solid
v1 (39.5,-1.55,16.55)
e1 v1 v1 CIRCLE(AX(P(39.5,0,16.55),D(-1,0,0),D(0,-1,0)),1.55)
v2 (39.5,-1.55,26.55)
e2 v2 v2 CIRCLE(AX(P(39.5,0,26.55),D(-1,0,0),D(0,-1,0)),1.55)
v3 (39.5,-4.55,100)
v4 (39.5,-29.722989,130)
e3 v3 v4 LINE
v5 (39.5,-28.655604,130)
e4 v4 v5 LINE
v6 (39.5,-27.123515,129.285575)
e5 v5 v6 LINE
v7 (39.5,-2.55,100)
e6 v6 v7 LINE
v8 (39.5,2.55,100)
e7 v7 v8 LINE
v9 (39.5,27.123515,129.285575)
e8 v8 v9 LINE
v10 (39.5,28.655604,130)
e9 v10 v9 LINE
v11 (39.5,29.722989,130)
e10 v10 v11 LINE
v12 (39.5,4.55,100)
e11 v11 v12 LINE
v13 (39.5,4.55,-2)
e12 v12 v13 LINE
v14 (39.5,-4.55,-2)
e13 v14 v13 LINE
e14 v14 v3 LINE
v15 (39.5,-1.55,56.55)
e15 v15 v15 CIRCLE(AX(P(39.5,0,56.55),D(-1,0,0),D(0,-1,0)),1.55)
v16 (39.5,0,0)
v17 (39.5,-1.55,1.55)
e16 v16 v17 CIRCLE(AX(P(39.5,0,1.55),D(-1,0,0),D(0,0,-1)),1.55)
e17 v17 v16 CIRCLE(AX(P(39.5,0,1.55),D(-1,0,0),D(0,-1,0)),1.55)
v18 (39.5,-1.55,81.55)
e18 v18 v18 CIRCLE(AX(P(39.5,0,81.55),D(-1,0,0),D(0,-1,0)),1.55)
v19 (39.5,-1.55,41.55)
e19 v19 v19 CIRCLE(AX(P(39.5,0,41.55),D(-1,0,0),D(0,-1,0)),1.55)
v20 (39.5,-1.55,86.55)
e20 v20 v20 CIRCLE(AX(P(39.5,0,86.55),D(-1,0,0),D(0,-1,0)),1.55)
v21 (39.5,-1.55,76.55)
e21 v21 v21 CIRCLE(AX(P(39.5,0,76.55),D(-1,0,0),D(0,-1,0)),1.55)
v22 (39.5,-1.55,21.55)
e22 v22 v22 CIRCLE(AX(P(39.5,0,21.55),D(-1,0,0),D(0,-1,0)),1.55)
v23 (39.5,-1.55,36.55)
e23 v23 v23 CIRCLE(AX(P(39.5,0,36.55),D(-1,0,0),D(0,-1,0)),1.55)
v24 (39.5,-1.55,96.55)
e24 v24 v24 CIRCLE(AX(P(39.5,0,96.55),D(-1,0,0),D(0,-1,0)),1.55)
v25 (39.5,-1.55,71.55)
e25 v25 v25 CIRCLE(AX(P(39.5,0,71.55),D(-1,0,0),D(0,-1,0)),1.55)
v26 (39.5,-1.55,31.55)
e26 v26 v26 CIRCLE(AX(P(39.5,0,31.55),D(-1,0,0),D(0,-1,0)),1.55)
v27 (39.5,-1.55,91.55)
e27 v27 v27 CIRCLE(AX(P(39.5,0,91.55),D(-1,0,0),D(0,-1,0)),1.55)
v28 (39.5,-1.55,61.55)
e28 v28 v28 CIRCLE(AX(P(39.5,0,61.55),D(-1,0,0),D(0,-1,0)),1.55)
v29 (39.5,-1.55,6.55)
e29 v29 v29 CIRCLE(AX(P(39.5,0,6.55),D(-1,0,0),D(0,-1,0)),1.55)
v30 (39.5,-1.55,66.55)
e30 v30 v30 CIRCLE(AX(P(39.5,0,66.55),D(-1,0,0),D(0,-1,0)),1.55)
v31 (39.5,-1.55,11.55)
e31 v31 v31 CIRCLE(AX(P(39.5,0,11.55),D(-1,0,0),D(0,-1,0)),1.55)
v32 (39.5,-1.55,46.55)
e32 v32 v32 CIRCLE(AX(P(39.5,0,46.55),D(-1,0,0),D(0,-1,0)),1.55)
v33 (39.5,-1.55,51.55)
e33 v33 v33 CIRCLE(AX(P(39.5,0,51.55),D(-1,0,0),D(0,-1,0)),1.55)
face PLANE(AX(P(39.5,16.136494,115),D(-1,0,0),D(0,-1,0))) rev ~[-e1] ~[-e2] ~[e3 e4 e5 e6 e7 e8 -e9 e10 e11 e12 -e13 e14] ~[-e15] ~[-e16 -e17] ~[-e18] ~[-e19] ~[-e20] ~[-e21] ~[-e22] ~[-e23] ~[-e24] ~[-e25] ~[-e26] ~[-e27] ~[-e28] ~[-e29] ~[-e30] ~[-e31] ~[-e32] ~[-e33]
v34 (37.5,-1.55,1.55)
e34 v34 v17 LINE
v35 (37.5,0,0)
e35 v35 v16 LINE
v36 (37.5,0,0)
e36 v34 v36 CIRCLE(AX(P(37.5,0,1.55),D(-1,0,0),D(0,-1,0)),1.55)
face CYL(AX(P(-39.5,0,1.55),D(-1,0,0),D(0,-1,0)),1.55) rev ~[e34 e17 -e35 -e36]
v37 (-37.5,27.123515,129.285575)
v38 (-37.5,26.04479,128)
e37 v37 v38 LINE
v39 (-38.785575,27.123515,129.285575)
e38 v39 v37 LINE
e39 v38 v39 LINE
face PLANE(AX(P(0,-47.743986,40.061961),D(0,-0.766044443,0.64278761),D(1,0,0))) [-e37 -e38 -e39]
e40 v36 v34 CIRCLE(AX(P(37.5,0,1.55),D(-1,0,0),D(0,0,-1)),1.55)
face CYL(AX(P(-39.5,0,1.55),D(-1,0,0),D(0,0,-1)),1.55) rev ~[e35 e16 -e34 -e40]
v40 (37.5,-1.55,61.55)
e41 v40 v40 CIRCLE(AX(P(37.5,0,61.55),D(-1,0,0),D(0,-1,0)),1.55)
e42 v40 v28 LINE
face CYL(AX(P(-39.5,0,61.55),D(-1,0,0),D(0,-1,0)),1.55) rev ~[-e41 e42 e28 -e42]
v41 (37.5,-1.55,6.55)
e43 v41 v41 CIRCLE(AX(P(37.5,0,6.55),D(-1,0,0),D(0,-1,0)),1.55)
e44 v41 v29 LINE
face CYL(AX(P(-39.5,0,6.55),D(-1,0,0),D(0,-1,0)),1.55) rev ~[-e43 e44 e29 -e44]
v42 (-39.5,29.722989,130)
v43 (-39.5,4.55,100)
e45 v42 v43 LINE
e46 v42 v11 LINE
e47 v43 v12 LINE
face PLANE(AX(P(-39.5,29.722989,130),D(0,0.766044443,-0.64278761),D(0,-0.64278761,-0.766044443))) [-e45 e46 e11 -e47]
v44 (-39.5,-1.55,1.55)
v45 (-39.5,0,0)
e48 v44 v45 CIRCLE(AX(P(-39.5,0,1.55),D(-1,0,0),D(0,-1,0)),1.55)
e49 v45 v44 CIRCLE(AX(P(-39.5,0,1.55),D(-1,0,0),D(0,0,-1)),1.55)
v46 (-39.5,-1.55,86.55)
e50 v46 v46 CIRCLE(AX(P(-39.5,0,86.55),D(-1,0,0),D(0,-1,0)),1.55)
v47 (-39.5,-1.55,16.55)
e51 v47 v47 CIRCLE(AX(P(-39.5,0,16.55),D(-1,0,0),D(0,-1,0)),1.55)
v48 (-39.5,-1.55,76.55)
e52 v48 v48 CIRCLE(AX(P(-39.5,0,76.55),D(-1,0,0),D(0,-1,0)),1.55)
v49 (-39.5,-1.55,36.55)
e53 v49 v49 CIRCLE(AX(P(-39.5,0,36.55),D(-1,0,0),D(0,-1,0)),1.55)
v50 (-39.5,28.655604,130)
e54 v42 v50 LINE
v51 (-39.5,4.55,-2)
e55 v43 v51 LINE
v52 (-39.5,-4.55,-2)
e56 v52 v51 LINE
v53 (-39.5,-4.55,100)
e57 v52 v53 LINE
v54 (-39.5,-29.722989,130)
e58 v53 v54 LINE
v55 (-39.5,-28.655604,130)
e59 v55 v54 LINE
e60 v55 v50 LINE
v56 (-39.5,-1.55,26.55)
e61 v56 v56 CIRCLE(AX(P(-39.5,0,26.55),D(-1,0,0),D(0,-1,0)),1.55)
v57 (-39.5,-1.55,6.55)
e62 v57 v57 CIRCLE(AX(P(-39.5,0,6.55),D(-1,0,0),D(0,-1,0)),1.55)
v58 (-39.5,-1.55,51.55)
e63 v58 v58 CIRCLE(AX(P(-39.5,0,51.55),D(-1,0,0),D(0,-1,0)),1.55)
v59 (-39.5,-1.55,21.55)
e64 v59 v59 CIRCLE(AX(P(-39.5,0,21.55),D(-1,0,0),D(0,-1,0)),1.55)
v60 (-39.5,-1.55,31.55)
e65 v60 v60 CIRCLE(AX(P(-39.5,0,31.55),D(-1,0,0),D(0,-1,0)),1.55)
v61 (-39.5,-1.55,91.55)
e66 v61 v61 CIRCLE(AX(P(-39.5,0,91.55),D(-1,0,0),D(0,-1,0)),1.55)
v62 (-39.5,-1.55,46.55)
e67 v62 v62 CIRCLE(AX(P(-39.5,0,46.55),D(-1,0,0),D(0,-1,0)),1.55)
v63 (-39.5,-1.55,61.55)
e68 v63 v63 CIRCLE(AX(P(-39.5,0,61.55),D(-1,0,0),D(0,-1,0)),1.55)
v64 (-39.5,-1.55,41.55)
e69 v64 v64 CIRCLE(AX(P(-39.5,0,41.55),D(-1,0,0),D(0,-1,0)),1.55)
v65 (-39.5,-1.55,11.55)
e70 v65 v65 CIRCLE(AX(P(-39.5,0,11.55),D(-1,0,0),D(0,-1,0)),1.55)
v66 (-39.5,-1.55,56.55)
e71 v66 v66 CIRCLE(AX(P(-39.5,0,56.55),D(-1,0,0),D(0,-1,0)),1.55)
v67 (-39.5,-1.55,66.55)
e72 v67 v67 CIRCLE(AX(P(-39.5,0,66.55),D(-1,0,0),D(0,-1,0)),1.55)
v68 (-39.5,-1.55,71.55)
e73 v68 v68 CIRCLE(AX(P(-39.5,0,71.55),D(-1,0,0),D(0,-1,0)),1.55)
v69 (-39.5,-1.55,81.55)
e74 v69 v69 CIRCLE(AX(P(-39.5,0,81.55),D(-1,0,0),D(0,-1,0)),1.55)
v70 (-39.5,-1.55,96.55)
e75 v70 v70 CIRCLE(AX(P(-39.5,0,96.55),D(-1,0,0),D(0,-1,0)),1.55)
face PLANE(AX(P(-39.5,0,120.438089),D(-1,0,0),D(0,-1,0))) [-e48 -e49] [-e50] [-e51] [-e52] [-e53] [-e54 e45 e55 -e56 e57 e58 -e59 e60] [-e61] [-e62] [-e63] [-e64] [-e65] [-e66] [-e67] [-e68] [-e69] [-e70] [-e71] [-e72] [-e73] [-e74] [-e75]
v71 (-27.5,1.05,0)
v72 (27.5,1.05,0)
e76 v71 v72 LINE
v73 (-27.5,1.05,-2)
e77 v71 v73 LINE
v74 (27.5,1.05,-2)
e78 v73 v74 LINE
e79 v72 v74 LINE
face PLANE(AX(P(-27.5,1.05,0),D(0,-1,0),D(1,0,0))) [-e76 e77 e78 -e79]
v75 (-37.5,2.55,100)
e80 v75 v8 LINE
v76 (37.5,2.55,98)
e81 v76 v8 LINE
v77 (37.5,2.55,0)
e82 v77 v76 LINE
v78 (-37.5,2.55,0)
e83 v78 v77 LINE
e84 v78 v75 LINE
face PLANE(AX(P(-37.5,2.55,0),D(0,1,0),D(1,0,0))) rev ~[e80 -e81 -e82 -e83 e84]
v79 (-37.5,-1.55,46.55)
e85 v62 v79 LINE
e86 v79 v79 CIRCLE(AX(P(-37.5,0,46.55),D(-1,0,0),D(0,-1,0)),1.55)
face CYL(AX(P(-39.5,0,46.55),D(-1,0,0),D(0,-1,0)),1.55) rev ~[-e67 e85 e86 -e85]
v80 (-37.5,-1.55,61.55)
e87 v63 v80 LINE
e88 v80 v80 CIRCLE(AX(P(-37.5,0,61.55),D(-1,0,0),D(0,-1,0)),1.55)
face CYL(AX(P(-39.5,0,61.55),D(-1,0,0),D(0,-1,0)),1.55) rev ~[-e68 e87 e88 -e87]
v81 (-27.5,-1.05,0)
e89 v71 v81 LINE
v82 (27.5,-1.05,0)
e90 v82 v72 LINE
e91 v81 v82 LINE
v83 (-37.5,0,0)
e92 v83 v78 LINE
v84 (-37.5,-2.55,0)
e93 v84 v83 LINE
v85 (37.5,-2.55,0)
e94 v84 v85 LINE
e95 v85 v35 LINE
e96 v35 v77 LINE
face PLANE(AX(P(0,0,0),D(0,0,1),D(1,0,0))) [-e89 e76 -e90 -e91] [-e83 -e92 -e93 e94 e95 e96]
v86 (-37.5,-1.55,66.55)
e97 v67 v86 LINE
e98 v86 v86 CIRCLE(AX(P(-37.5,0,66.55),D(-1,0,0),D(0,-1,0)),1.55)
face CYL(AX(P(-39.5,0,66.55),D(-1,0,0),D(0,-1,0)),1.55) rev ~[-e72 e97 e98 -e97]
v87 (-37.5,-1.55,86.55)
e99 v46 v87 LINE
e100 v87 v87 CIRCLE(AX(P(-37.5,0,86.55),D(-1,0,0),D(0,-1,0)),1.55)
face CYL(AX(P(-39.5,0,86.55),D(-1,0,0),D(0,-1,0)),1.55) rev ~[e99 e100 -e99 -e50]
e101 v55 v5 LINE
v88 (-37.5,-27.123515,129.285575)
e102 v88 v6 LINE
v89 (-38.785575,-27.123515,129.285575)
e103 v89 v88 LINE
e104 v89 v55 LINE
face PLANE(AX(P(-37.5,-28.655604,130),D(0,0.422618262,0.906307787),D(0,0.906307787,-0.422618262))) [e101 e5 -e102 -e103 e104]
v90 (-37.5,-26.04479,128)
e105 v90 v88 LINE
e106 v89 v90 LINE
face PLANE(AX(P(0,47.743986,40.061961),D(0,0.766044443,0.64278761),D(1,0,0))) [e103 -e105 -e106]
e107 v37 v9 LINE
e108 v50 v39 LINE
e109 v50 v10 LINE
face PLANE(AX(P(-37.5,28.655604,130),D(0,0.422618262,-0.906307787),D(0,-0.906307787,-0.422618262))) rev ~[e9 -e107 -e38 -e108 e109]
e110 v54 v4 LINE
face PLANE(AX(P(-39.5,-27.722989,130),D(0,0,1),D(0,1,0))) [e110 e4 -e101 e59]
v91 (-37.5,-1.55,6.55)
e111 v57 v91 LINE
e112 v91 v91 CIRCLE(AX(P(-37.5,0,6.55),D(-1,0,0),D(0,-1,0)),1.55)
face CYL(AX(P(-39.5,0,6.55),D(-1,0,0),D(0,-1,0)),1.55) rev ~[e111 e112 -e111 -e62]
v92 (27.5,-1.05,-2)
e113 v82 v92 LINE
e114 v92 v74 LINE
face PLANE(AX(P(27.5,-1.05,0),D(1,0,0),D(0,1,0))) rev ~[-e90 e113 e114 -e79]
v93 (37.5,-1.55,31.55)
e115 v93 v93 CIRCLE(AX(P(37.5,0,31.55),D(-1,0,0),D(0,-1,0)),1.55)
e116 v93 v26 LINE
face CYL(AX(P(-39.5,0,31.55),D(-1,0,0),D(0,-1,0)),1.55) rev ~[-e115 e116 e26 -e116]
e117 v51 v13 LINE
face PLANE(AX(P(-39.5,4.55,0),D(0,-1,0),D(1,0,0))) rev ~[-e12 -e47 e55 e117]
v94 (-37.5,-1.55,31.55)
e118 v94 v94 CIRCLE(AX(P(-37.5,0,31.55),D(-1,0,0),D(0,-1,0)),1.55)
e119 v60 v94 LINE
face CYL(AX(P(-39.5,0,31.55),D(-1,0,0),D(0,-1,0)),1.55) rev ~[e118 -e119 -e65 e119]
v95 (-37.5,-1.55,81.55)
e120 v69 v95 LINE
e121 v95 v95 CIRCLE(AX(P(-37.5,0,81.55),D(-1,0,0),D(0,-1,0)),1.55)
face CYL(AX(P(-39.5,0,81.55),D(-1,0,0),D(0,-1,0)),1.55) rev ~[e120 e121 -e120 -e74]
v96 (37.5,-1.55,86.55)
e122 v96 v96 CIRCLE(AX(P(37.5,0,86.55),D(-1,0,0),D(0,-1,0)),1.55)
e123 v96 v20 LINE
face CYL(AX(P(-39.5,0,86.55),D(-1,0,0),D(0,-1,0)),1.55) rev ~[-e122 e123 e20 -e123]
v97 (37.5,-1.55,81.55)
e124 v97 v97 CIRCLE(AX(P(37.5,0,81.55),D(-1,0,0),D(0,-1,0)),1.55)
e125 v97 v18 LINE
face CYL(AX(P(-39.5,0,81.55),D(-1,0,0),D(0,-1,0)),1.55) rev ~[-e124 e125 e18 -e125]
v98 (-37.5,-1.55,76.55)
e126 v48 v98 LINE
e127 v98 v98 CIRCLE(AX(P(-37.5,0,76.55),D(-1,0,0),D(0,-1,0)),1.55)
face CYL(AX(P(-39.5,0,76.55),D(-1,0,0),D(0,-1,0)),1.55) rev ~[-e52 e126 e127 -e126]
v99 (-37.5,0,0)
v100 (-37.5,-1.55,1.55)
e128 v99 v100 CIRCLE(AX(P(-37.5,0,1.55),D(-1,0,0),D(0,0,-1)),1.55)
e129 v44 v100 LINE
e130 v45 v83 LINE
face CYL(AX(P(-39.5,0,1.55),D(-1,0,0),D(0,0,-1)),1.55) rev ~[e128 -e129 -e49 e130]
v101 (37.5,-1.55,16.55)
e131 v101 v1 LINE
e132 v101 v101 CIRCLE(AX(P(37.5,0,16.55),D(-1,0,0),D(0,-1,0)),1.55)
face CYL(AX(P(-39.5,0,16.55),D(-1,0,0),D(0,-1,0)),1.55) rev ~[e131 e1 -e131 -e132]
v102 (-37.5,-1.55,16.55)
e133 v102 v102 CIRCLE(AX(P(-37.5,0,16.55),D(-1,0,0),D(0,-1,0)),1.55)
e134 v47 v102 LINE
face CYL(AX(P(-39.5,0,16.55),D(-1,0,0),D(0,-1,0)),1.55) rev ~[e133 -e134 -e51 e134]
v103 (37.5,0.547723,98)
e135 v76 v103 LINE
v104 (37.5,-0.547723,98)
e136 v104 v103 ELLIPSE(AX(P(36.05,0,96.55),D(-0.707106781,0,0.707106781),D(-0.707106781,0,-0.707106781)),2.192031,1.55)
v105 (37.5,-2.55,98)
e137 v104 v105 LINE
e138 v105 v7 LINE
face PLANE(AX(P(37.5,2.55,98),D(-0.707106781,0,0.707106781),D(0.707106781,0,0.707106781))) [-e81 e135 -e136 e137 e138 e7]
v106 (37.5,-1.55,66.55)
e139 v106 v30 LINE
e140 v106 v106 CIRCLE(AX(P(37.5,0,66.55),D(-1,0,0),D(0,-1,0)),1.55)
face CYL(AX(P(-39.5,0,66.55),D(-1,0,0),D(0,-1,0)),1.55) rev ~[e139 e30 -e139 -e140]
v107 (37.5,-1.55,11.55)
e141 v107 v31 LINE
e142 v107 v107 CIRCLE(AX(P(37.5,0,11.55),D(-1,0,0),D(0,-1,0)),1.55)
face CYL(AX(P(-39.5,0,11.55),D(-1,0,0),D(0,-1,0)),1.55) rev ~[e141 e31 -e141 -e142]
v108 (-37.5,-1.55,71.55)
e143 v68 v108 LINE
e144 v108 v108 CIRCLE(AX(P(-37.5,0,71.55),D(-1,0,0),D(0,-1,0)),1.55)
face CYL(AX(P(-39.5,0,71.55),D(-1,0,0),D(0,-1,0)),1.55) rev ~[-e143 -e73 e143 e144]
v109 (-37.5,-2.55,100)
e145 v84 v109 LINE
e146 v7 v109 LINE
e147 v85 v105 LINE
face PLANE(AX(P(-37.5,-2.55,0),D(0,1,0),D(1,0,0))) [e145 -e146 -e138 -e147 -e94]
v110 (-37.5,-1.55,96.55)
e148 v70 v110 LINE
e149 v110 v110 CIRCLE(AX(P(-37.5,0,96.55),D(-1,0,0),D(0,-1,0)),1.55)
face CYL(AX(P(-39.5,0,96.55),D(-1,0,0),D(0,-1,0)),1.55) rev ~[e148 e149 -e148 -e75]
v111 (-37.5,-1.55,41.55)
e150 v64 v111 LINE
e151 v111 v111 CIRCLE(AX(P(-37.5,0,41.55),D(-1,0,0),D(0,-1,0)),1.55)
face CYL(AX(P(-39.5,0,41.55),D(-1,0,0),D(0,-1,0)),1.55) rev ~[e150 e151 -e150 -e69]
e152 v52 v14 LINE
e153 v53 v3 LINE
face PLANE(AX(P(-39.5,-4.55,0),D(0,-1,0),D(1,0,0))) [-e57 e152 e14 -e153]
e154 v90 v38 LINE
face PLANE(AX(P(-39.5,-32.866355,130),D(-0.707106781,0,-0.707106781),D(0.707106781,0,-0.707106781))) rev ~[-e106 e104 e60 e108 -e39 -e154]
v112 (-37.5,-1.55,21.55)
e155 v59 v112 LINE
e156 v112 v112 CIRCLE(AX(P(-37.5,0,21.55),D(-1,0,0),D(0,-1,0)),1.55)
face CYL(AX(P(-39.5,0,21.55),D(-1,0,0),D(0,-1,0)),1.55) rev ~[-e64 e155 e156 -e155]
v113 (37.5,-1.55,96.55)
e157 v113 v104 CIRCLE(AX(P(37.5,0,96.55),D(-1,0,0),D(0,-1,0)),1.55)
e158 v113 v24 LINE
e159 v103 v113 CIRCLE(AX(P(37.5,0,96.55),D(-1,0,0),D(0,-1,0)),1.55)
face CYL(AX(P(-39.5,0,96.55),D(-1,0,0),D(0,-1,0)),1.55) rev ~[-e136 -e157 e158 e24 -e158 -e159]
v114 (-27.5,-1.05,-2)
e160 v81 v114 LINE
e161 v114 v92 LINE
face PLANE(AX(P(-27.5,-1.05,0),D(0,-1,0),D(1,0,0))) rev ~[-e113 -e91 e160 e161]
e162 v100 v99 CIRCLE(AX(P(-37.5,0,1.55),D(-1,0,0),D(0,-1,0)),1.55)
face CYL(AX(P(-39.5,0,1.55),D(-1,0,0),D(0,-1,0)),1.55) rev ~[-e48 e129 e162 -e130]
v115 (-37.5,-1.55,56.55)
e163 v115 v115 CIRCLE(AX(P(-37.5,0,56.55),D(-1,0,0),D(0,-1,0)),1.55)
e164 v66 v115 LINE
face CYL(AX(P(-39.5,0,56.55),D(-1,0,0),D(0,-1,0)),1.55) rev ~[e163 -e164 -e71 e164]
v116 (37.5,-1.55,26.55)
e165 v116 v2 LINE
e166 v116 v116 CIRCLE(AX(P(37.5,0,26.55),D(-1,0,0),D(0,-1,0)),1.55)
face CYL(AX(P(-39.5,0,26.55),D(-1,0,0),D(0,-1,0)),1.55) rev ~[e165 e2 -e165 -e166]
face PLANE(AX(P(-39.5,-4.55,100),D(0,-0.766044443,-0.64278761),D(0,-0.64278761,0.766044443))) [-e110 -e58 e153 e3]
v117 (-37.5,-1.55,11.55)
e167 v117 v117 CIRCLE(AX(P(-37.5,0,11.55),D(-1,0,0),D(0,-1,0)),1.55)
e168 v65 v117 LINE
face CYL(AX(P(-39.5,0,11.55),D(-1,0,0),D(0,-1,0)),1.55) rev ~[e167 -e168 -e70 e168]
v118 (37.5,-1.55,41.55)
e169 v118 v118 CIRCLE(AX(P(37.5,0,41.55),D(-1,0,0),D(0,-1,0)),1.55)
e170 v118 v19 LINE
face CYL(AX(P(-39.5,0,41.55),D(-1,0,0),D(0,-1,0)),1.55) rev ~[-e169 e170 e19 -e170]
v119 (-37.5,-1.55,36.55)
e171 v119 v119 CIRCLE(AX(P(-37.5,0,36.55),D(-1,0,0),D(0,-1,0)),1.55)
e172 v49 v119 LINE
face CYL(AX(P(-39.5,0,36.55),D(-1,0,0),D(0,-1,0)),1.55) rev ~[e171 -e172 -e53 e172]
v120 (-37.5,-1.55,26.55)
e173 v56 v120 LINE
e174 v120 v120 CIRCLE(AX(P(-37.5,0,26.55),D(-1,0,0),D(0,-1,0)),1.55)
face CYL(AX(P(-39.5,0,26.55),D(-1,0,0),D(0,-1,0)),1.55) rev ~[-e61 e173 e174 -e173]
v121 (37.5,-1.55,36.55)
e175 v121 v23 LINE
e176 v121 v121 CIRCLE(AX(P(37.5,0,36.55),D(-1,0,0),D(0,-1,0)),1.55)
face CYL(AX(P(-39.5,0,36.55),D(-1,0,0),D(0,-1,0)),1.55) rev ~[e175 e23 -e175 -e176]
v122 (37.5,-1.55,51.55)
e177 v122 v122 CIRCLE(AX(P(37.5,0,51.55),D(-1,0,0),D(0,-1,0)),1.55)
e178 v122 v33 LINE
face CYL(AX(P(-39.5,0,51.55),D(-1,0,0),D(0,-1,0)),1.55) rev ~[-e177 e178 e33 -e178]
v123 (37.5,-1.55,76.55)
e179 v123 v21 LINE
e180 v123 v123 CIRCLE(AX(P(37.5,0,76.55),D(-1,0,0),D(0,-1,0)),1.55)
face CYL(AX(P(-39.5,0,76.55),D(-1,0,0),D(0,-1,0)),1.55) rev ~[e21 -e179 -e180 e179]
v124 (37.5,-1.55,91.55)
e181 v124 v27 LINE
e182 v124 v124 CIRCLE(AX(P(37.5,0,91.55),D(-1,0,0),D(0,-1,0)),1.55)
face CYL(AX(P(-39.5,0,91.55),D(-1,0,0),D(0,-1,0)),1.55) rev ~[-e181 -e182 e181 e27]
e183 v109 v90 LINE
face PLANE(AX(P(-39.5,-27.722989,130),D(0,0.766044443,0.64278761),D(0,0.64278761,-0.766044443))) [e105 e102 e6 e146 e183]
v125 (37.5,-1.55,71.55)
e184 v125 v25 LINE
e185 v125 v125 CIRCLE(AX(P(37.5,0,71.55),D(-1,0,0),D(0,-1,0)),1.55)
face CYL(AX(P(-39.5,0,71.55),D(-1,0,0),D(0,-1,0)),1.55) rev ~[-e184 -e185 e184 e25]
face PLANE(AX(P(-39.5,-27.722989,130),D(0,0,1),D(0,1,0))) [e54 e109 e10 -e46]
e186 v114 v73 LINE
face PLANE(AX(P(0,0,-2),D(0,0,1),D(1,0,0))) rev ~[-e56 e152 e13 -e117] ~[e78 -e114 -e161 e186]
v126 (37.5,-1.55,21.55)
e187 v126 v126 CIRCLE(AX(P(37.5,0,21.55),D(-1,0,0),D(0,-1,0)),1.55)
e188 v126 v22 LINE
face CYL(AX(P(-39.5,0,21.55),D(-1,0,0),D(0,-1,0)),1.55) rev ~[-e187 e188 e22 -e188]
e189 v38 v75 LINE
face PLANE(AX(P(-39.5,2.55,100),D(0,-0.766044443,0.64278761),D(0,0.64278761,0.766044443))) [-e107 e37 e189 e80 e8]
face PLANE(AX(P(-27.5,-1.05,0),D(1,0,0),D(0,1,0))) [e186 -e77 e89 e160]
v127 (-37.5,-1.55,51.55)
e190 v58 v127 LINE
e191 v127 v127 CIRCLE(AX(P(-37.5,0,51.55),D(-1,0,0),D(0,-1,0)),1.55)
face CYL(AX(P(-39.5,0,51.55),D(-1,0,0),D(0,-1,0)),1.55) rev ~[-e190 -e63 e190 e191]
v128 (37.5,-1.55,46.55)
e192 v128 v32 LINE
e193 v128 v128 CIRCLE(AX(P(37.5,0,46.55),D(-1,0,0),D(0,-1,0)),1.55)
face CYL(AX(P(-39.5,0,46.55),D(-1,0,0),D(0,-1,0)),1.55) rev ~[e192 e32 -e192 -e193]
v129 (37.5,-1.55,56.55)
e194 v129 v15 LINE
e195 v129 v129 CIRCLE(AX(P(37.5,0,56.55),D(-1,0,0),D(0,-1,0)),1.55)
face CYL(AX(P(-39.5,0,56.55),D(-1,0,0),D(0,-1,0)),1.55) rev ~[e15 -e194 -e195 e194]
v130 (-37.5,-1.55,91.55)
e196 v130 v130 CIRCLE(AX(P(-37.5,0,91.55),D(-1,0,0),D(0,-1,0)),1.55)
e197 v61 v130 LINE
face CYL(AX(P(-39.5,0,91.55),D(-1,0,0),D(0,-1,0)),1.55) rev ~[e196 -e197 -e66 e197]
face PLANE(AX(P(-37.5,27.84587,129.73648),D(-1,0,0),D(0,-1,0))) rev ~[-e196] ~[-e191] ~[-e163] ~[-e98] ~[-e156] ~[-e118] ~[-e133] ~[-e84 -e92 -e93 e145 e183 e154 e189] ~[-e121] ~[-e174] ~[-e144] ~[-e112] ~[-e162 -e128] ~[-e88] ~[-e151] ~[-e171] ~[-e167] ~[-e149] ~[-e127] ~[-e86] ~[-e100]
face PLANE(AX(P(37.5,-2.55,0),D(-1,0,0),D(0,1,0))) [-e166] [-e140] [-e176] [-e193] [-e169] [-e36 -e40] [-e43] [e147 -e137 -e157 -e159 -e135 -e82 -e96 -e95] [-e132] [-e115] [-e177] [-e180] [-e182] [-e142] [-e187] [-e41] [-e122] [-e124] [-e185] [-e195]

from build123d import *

# Parameters (mm, degrees)
F0_W         = 79
F0_H         = 9.1
F0_W_2       = 75
F0_H_2       = 5.1
F1_DEPTH     = 100
F0_W_3       = 55
F0_H_3       = 2.1
F2_DEPTH     = 2
F3_R         = 1.55
F4_DEPTH     = 79.001
F6_DEPTH     = 79
F7_DEPTH     = 2
F8_T1_DEPTH  = 5.1
F8_T3_DEPTH  = 79.5142210175
F8_T8_DEPTH  = 65.7327098225
F8_T15_DEPTH = 79.5142210175
F8_T20_DEPTH = 65.7327098225
F8_T28_DEPTH = 65.7327098225
F8_T33_DEPTH = 79.5142210175


# Not quite as in the source:
# - a fillet or chamfer that OpenCascade refuses, or shapes differently, is made with other operations: its cross-section is extruded or revolved along the edge and cut away or added


with BuildPart() as f1:
    # F0 (on Top) → F1 (new body)
    with BuildSketch(Plane.XY):
        Rectangle(F0_W, F0_H)
        Rectangle(F0_W_2, F0_H_2, mode=Mode.SUBTRACT)
    extrude(amount=F1_DEPTH)

    # F0 (on Top) → F2 (join)
    with BuildSketch(Plane.XY):
        Rectangle(F0_W, F0_H)
        Rectangle(F0_W_2, F0_H_2, mode=Mode.SUBTRACT)
        Rectangle(F0_W_2, F0_H_2)
        Rectangle(F0_W_3, F0_H_3, mode=Mode.SUBTRACT)
    extrude(amount=-F2_DEPTH)

    # F3 (on face) → F4 (cut, through all)
    with BuildSketch(Plane(origin=(-39.5, 0, 0), x_dir=(0, -1, 0), z_dir=(-1, 0, 0))):
        with BuildLine():
            ThreePointArc((0, 0), (1.0960155108, 0.4539844892), (1.55, 1.55))
            ThreePointArc((1.55, 1.55), (-1.0960155108, 2.6460155108), (0, 0))
        make_face()
        with Locations((0, 6.55)):
            Circle(F3_R)
        with Locations((0, 11.55)):
            Circle(F3_R)
        with Locations((0, 16.55)):
            Circle(F3_R)
        with Locations((0, 21.55)):
            Circle(F3_R)
        with Locations((0, 26.55)):
            Circle(F3_R)
        with Locations((0, 31.55)):
            Circle(F3_R)
        with Locations((0, 36.55)):
            Circle(F3_R)
        with Locations((0, 41.55)):
            Circle(F3_R)
        with Locations((0, 46.55)):
            Circle(F3_R)
        with Locations((0, 51.55)):
            Circle(F3_R)
        with Locations((0, 56.55)):
            Circle(F3_R)
        with Locations((0, 61.55)):
            Circle(F3_R)
        with Locations((0, 66.55)):
            Circle(F3_R)
        with Locations((0, 71.55)):
            Circle(F3_R)
        with Locations((0, 76.55)):
            Circle(F3_R)
        with Locations((0, 81.55)):
            Circle(F3_R)
        with Locations((0, 86.55)):
            Circle(F3_R)
        with Locations((0, 91.55)):
            Circle(F3_R)
        with Locations((0, 96.55)):
            Circle(F3_R)
    extrude(amount=-F4_DEPTH, mode=Mode.SUBTRACT)

    # F5 (on face) → F6 (join, through all)
    with BuildSketch(Plane(origin=(-39.5, 0, 0), x_dir=(0, -1, 0), z_dir=(-1, 0, 0))):
        Polygon((-29.7229889353, 130), (-4.55, 100), (-2.55, 100), (-27.7229889353, 130), align=None)
        Polygon((27.7229889353, 130), (2.55, 100), (4.55, 100), (29.7229889353, 130), align=None)
    extrude(amount=-F6_DEPTH)

    # F5 (on face) → F7 (join, through all)
    with BuildSketch(Plane(origin=(-39.5, 0, 0), x_dir=(0, -1, 0), z_dir=(-1, 0, 0))):
        Polygon((-27.7229889353, 130), (-2.55, 100), (2.55, 100), (27.7229889353, 130), align=None)
    extrude(amount=-F7_DEPTH)

    # F8: chamfer of 2 on 4 edges, made by hand

    # F8_s2 → F8_t1 (cut)
    with BuildSketch(Plane.XZ.offset(-2.55)):
        Polygon((37.5, 98), (39.5, 100), (37.5, 100), align=None)
    extrude(amount=F8_T1_DEPTH, mode=Mode.SUBTRACT)

    # F8_s4 → F8_t3 (cut)
    with BuildSketch(Plane.YZ.offset(-37.5)):
        Polygon((-28.6556042516, 130), (-27.1235153654, 129.2855752194), (-27.7229889353, 130), align=None)
        Polygon((28.6556042516, 130), (27.1235153654, 129.2855752194), (27.7229889353, 130), align=None)
    extrude(amount=F8_T3_DEPTH, mode=Mode.SUBTRACT)


with BuildPart() as f8_tool6:
    # F8_s7 → F8_t8 (new body)
    with BuildSketch(Plane.XZ.offset(32.8663549113)):
        Polygon((-39.5, 130), (-37.5, 128), (-37.5, 130), align=None)
    extrude(amount=-F8_T8_DEPTH)

    split(bisect_by=Plane(origin=(0, -47.7439862241, 40.0619612316), x_dir=(1, 0, 0), z_dir=(0, -0.7660444431, 0.6427876097)), keep=Keep.TOP)

    split(bisect_by=Plane(origin=(0, 47.7439862241, 40.0619612316), x_dir=(1, 0, 0), z_dir=(0, 0.7660444431, 0.6427876097)), keep=Keep.TOP)


with BuildPart() as f1_1:
    add(f1.part)

    # F8_t5: cut F8_tool6
    add(f8_tool6.part, mode=Mode.SUBTRACT)


with BuildPart() as f8_tool13:
    # F8_s14 → F8_t15 (new body)
    with BuildSketch(Plane.YZ.offset(-40.0142210175)):
        Polygon((-28.6556042516, 130), (-27.1235153654, 129.2855752194), (-27.7229889353, 130), align=None)
    extrude(amount=F8_T15_DEPTH)

    split(bisect_by=Plane.YZ.offset(-37.5), keep=Keep.BOTTOM)

    split(bisect_by=Plane.YZ.offset(-39.5), keep=Keep.TOP)


with BuildPart() as f8_tool18:
    # F8_s19 → F8_t20 (new body)
    with BuildSketch(Plane.XZ.offset(32.8663549113)):
        Polygon((-39.5, 130), (-37.5, 128), (-37.5, 130), align=None)
    extrude(amount=-F8_T20_DEPTH)

    split(bisect_by=Plane(origin=(0, 46.5703380464, 39.0771534786), x_dir=(1, 0, 0), z_dir=(0, 0.7660444431, 0.6427876097)), keep=Keep.TOP)

    split(bisect_by=Plane(origin=(0, 47.7439862241, 40.0619612316), x_dir=(1, 0, 0), z_dir=(0, -0.7660444431, -0.6427876097)), keep=Keep.TOP)


with BuildPart() as f8_tool13_1:
    add(f8_tool13.part)

    # F8_t23: intersect F8_tool18
    add(f8_tool18.part, mode=Mode.INTERSECT)


with BuildPart() as f1_2:
    add(f1_1.part)

    # F8_t11: cut F8_tool13
    add(f8_tool13_1.part, mode=Mode.SUBTRACT)


with BuildPart() as f8_tool26:
    # F8_s27 → F8_t28 (new body)
    with BuildSketch(Plane.XZ.offset(32.8663549113)):
        Polygon((-39.5, 130), (-37.5, 128), (-37.5, 130), align=None)
    extrude(amount=-F8_T28_DEPTH)

    split(bisect_by=Plane(origin=(0, -47.7439862241, 40.0619612316), x_dir=(1, 0, 0), z_dir=(0, 0.7660444431, -0.6427876097)), keep=Keep.TOP)

    split(bisect_by=Plane(origin=(0, -46.5703380464, 39.0771534786), x_dir=(1, 0, 0), z_dir=(0, -0.7660444431, 0.6427876097)), keep=Keep.TOP)


with BuildPart() as f8_tool31:
    # F8_s32 → F8_t33 (new body)
    with BuildSketch(Plane.YZ.offset(-40.0142210175)):
        Polygon((28.6556042516, 130), (27.1235153654, 129.2855752194), (27.7229889353, 130), align=None)
    extrude(amount=F8_T33_DEPTH)

    split(bisect_by=Plane.YZ.offset(-37.5), keep=Keep.BOTTOM)

    split(bisect_by=Plane.YZ.offset(-39.5), keep=Keep.TOP)


with BuildPart() as f8_tool26_1:
    add(f8_tool26.part)

    # F8_t36: intersect F8_tool31
    add(f8_tool31.part, mode=Mode.INTERSECT)


with BuildPart() as f1_3:
    add(f1_2.part)

    # F8_t24: cut F8_tool26
    add(f8_tool26_1.part, mode=Mode.SUBTRACT)


solid = f1_3.part
